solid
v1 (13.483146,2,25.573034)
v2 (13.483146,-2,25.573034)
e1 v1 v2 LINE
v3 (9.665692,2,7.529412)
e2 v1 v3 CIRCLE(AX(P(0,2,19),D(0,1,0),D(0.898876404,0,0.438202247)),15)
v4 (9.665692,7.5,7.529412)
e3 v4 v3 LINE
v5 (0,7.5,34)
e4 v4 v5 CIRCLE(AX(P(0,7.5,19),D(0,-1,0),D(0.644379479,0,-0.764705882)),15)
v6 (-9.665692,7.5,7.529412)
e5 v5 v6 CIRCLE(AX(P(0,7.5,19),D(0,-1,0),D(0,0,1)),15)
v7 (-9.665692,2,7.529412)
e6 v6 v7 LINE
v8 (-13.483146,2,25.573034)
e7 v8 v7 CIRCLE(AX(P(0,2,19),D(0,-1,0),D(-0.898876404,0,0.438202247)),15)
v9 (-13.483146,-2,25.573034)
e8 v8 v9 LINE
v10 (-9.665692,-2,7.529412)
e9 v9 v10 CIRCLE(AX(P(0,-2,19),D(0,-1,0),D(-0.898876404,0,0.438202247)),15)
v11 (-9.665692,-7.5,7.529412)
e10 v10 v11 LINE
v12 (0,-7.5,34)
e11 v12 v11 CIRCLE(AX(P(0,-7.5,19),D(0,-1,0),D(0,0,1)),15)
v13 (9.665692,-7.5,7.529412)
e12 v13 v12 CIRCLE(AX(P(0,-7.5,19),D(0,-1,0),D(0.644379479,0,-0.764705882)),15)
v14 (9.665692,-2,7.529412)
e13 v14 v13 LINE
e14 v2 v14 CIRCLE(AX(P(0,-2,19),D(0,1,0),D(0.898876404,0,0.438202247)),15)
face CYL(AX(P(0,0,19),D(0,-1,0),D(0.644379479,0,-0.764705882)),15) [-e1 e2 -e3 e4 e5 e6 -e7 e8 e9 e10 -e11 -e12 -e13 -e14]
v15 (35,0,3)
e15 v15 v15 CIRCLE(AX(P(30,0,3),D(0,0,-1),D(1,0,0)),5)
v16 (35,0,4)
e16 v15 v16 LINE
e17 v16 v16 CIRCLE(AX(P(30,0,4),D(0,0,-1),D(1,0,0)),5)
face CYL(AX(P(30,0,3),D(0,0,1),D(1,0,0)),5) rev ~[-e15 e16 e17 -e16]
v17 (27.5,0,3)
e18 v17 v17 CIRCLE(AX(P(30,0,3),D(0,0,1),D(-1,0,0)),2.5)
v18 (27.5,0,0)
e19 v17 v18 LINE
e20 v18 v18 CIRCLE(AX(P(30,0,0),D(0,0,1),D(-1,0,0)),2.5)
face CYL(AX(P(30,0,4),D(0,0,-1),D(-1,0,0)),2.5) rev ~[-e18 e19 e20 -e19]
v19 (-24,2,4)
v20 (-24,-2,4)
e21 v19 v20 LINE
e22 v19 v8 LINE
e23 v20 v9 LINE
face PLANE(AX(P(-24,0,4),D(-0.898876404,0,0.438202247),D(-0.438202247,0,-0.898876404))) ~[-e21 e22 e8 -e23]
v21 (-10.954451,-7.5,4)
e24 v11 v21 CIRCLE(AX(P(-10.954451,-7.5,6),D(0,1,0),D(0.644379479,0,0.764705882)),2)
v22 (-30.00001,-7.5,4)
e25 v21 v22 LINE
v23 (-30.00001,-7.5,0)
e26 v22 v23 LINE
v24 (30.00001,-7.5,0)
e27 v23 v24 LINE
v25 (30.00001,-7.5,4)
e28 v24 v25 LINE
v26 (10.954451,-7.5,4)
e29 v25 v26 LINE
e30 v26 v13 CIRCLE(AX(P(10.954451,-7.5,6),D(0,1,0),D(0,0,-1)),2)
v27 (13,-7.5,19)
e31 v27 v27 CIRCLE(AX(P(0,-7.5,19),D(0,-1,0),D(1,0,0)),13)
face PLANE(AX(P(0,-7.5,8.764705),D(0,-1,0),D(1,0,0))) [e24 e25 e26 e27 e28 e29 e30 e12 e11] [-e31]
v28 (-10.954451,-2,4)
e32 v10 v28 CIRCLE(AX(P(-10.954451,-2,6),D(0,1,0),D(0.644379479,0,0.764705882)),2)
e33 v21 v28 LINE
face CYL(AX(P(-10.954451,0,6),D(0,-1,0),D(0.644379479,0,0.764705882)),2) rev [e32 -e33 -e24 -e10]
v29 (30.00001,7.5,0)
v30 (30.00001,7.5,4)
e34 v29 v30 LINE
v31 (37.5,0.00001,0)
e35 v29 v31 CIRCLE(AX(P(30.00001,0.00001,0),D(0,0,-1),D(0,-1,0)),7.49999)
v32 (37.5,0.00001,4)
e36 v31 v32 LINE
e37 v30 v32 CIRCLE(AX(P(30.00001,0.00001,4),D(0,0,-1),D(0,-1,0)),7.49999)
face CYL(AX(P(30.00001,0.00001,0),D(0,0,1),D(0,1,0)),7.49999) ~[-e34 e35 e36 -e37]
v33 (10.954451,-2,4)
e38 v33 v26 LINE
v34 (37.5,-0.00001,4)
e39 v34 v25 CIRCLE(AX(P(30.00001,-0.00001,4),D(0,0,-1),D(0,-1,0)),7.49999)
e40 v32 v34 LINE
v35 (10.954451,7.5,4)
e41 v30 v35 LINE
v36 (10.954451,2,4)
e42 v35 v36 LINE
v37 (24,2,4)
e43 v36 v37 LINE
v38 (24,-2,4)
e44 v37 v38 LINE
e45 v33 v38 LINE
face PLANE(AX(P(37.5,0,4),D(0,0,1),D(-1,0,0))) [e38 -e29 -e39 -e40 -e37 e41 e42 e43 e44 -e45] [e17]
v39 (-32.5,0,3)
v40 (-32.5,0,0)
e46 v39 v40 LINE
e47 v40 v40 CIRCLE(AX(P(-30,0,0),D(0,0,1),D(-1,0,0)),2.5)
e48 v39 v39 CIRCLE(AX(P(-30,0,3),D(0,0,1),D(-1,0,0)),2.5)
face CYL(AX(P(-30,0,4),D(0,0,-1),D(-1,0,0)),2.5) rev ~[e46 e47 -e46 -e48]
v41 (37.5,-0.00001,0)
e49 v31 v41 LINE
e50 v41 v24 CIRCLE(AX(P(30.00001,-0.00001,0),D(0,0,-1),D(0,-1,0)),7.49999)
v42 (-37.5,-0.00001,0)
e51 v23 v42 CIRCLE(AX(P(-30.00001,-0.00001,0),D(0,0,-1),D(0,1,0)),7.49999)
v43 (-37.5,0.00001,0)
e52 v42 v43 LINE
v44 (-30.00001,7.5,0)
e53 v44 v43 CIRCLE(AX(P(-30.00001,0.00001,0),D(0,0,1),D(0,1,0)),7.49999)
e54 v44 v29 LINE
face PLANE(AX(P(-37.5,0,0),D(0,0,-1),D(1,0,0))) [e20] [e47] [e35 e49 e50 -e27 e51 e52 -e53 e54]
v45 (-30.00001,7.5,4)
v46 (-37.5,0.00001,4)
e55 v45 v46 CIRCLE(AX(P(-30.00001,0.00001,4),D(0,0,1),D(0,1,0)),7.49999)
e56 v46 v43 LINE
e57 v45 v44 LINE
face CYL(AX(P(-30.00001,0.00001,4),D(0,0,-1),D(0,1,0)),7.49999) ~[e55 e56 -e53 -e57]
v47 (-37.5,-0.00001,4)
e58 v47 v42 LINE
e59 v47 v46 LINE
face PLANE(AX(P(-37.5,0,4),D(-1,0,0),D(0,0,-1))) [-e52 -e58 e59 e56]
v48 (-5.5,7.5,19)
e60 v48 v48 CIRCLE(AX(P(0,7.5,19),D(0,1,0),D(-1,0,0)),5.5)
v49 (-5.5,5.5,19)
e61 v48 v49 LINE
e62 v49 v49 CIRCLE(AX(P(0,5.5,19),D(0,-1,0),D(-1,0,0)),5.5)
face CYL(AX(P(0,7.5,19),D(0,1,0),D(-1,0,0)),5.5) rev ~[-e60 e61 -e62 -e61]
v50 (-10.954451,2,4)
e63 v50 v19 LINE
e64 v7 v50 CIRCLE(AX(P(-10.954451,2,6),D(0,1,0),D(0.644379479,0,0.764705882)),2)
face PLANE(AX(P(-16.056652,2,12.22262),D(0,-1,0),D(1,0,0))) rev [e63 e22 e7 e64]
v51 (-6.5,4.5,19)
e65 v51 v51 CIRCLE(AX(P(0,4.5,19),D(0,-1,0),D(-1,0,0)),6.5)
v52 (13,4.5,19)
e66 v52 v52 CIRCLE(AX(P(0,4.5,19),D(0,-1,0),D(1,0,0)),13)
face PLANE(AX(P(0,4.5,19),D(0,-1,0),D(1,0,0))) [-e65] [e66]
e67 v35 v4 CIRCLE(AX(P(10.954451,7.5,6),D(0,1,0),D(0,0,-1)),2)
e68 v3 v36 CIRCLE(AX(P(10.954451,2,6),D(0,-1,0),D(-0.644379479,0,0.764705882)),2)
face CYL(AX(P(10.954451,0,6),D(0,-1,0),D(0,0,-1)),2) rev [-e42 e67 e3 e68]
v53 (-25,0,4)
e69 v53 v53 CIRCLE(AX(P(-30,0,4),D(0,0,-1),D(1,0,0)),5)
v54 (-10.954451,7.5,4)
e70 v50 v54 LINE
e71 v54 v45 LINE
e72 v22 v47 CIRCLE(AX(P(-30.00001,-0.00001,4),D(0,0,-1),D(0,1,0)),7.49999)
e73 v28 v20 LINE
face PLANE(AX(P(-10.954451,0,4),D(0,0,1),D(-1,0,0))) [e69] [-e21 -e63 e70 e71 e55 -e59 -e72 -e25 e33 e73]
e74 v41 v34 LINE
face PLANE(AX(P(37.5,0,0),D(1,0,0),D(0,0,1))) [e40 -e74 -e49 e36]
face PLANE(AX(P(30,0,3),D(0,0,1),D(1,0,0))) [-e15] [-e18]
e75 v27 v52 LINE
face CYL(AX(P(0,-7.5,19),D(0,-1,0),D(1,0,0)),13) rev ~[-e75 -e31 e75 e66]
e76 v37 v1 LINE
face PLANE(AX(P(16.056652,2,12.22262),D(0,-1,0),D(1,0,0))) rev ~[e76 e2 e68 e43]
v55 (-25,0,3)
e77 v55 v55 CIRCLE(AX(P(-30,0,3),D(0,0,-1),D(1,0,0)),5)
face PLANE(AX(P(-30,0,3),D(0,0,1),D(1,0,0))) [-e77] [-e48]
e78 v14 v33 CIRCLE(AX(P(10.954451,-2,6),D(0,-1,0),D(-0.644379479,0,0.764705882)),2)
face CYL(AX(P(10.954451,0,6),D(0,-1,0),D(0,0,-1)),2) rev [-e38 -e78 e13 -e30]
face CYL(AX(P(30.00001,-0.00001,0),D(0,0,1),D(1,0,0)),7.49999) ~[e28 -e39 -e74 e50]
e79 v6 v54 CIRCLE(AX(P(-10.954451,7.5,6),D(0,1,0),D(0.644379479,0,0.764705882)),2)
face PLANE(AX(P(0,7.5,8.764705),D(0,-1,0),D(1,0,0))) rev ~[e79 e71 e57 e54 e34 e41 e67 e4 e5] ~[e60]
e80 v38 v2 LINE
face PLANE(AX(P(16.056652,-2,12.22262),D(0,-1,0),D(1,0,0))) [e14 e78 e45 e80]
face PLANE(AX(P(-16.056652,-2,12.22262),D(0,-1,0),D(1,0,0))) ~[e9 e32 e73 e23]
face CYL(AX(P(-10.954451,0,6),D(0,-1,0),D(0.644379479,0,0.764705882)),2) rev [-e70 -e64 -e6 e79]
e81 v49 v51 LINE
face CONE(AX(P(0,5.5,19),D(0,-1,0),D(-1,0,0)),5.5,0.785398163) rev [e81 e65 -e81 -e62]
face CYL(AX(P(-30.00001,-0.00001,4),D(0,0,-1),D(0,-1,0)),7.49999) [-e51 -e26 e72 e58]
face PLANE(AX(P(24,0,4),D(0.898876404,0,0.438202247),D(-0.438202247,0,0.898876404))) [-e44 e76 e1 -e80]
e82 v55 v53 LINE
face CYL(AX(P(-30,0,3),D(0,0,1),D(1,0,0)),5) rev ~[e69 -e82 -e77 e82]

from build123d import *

# Parameters (mm, degrees)
F2_DEPTH       = 7.5
F3_R           = 13
F4_DEPTH       = 12
F5_R           = 5.5
F6_DEPTH       = 15.001
F7_R           = 7.49999
F9_D           = 5
F9_CBORE_D     = 10
F9_CBORE_DEPTH = 1
F11_DEPTH      = 2
F12_SIZE       = 1


# Not quite as in the source:
# - a fillet or chamfer is up to 0.001 mm smaller than in the source, because OpenCascade refuses the exact size


with BuildPart() as f2:
    # F1 (on Front) → F2 (new body, symmetric)
    with BuildSketch(Plane.XZ):
        with BuildLine():
            Line((-37.5, 0), (0, 0))
            Line((0, 0), (37.5, 0))
            Line((37.5, 0), (37.5, 4))
            Line((37.5, 4), (10.9544511501, 4))
            ThreePointArc((10.9544511501, 4), (9.0757782768, 5.3140056594), (9.6656921913, 7.5294117647))
            ThreePointArc((9.6656921913, 7.5294117647), (14.0900465494, 24.1449575543), (0, 34))
            ThreePointArc((0, 34), (-14.0900465494, 24.1449575543), (-9.6656921913, 7.5294117647))
            ThreePointArc((-9.6656921913, 7.5294117647), (-9.0757782768, 5.3140056594), (-10.9544511501, 4))
            Line((-10.9544511501, 4), (-37.5, 4))
            Line((-37.5, 4), (-37.5, 0))
        make_face()
    extrude(amount=F2_DEPTH, both=True)

    # F3 (on face) → F4 (cut)
    with BuildSketch(Plane.XZ.offset(7.5)):
        with Locations((0, 19)):
            Circle(F3_R)
    extrude(amount=-F4_DEPTH, mode=Mode.SUBTRACT)

    # F5 (on face) → F6 (cut, through all)
    with BuildSketch(Plane(origin=(0, 7.5, 0), x_dir=(-1, 0, 0), z_dir=(0, 1, 0))):
        with Locations((0, 19)):
            Circle(F5_R)
    extrude(amount=-F6_DEPTH, mode=Mode.SUBTRACT)

    # F7 (radius 7.5 in the source; OpenCascade refuses exactly that, so slightly less here)
    f7_edges = [f2.edges().sort_by_distance(p)[0] for p in [
        (37.5, -7.5, 2),
        (37.5, 7.5, 2),
        (-37.5, -7.5, 2),
        (-37.5, 7.5, 2),
    ]]
    fillet(f7_edges, radius=F7_R)

    # F9 (through all)
    with Locations(Plane.XY.offset(4)):
        with Locations((30, 0), (-30, 0)):
            CounterBoreHole(F9_D / 2, F9_CBORE_D / 2, F9_CBORE_DEPTH)

    # F10 (on Front) → F11 (join, symmetric)
    with BuildSketch(Plane.XZ):
        with BuildLine():
            Line((10.9544511501, 4), (24, 4))
            Line((24, 4), (13.4831460674, 25.5730337079))
            ThreePointArc((13.4831460674, 25.5730337079), (14.6751576274, 15.8952055444), (9.6656921913, 7.5294117647))
            ThreePointArc((9.6656921913, 7.5294117647), (9.0757782768, 5.3140056594), (10.9544511501, 4))
        make_face()
    extrude(amount=F11_DEPTH, both=True)

    # F12
    f12_edges = [f2.edges().sort_by_distance(p)[0] for p in [
        (5.5, 4.5, 19),
    ]]
    chamfer(f12_edges, length=F12_SIZE)

    # F13: F2 across plane


with BuildPart() as f2_1:
    add(f2.part)
    add(f2.part.mirror(Plane.YZ))


solid = f2_1.part
